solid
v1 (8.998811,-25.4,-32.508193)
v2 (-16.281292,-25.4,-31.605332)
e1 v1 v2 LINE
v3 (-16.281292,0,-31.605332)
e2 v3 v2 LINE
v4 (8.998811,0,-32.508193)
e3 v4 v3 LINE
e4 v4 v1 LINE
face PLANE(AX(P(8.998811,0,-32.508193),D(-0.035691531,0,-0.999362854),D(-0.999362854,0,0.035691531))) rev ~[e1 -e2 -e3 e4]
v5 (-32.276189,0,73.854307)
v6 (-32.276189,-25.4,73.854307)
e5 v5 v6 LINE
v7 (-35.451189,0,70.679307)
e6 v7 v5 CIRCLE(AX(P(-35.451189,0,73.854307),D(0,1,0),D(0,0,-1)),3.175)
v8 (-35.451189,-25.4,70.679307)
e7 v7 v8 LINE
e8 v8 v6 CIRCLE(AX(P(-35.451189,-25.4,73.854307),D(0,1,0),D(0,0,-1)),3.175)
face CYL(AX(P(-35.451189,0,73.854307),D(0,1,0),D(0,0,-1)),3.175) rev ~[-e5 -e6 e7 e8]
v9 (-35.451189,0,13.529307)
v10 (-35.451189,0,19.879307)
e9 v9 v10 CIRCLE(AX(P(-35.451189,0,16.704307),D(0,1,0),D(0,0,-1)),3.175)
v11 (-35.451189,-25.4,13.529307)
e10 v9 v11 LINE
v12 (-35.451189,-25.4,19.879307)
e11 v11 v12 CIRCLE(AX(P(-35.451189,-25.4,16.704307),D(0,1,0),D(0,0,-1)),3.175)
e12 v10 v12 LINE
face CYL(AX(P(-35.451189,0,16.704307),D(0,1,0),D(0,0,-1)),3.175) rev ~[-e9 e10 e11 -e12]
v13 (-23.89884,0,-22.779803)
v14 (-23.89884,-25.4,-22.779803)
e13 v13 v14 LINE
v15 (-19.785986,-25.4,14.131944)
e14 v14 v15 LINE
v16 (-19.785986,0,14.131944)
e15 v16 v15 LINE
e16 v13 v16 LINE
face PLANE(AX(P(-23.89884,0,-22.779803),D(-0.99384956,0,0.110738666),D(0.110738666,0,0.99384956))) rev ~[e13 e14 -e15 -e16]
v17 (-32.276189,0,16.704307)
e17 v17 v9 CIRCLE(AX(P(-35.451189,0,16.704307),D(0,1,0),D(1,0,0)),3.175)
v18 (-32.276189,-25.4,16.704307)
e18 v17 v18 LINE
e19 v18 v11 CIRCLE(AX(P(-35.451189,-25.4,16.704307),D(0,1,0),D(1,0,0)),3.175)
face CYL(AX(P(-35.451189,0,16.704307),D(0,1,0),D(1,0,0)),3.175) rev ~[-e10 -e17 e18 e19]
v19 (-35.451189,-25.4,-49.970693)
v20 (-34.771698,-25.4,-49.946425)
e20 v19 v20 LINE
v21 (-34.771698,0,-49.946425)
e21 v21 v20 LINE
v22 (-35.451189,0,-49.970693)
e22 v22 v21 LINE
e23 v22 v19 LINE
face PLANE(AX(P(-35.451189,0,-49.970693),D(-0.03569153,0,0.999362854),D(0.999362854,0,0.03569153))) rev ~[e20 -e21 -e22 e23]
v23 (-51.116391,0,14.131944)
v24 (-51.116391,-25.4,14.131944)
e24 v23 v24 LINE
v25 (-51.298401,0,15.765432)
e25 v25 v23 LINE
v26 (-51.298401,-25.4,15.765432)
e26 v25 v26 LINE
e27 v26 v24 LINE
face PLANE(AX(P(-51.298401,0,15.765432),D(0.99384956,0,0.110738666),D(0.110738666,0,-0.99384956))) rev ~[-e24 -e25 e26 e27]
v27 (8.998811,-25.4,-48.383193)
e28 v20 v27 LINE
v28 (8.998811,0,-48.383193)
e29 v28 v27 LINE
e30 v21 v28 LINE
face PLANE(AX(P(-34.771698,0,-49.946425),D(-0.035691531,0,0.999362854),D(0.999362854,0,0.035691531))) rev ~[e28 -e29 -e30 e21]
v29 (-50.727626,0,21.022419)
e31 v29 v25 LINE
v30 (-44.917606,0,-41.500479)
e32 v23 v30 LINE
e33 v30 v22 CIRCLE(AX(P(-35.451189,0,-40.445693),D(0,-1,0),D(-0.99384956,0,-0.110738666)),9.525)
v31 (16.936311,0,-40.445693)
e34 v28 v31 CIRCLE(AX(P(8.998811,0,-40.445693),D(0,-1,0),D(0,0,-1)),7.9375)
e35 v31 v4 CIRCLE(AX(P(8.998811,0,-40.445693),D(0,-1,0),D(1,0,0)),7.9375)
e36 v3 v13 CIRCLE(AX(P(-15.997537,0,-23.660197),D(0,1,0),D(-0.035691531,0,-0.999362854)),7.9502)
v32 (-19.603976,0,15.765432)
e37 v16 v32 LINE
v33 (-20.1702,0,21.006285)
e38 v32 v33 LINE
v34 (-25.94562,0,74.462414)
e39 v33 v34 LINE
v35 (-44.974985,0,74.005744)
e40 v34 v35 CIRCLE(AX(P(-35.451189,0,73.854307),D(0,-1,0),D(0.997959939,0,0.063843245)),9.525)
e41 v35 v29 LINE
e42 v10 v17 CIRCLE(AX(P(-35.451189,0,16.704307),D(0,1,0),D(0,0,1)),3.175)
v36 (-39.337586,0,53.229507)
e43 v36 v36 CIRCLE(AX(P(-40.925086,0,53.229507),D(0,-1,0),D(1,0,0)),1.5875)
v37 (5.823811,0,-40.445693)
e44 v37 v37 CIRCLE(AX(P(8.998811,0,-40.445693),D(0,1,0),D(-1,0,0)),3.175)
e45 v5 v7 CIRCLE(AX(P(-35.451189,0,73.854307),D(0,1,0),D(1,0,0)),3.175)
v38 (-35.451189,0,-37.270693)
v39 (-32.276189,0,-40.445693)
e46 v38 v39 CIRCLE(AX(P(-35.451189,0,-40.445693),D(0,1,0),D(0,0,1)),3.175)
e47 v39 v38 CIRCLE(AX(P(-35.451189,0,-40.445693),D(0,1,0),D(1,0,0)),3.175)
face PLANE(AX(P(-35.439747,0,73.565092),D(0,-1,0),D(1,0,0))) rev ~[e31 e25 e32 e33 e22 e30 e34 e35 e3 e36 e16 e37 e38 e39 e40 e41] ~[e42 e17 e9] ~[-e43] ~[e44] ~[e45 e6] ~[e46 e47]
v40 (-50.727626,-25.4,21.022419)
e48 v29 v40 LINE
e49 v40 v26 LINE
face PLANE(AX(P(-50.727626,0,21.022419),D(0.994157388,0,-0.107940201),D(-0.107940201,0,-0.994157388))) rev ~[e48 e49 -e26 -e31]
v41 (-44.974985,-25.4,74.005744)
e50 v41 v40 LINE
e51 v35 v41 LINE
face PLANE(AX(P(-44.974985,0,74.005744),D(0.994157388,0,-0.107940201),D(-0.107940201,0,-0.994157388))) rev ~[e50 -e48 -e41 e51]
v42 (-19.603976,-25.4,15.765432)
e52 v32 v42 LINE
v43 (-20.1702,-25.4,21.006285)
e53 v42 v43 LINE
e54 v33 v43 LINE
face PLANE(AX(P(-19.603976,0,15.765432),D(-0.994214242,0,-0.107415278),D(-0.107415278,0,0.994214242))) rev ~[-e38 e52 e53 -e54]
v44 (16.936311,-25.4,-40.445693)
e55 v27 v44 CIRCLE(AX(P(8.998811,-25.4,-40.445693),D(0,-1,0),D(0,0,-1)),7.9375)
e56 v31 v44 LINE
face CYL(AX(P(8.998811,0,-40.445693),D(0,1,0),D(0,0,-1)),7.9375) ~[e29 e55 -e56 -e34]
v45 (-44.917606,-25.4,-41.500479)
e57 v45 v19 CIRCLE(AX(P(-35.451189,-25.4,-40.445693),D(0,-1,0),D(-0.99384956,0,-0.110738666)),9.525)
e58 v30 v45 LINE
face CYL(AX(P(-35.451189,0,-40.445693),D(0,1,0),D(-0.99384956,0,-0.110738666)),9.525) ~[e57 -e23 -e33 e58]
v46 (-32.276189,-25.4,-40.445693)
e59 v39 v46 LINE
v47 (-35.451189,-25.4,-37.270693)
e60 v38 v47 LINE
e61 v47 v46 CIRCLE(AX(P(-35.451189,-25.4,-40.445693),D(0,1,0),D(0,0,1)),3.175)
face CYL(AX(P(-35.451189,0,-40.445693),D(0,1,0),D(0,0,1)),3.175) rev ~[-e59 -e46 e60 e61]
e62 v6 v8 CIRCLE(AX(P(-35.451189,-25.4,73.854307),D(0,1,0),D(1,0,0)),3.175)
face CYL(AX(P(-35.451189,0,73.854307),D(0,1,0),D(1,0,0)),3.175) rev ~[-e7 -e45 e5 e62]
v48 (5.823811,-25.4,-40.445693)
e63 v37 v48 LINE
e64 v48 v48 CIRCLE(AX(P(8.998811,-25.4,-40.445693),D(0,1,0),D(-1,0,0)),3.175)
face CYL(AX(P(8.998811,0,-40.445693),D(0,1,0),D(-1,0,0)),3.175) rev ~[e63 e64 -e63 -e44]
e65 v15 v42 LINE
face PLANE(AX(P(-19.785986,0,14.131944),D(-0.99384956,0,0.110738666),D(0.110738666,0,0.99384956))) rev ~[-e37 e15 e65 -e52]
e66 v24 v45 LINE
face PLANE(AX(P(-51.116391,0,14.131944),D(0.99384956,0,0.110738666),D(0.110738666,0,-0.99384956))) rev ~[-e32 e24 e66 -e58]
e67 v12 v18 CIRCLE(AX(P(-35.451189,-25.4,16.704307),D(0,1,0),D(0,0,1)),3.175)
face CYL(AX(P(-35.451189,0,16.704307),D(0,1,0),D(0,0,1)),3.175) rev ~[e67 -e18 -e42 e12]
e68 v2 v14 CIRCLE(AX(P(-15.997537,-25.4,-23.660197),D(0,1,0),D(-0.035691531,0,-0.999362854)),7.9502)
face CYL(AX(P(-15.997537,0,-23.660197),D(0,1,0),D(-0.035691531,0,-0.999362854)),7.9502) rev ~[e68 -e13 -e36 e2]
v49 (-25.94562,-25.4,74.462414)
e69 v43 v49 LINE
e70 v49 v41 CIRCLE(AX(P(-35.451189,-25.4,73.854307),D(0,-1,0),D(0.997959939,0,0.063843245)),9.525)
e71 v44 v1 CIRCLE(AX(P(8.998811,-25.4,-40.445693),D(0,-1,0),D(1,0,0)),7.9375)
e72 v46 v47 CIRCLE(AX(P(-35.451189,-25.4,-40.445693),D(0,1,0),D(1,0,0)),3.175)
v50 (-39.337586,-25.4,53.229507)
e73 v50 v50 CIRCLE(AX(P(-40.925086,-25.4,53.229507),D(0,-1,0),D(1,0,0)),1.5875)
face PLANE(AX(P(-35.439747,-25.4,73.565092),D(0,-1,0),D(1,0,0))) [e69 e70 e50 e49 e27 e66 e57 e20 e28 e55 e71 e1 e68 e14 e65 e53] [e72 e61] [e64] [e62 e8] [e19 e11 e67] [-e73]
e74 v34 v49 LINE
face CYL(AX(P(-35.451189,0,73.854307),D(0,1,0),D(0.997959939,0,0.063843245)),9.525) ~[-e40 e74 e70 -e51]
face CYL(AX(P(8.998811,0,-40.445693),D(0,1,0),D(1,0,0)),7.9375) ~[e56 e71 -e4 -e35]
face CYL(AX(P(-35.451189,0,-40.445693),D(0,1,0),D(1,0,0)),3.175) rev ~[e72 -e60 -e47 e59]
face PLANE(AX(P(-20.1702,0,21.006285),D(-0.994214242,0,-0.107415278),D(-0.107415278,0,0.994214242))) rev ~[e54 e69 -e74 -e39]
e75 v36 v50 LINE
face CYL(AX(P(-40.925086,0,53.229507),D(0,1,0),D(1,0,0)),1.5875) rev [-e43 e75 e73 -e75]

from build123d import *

# Parameters (mm, degrees)
F0_R     = 1.5875
F1_DEPTH = 25.4


with BuildPart() as f1:
    # F0 (on Front) → F1 (new body)
    with BuildSketch(Plane.XZ):
        with BuildLine():
            ThreePointArc((-44.9749847751, 74.0057436376), (-42.239710519, 67.1728704693), (-35.4511886835, 64.3293071628))
            ThreePointArc((-35.4511886835, 64.3293071628), (-28.7159965927, 67.119115072), (-25.9261886835, 73.8543071628))
            ThreePointArc((-25.9261886835, 73.8543071628), (-25.931047818, 74.1585158089), (-25.9456202636, 74.4624140737))
            ThreePointArc((-25.9456202636, 74.4624140737), (-35.6797057153, 83.3765655591), (-44.9749847751, 74.0057436376))
        make_face()
        with BuildLine():
            ThreePointArc((-32.2761886835, 73.8543071628), (-33.2061246532, 71.6092431325), (-35.4511886835, 70.6793071628))
            ThreePointArc((-35.4511886835, 70.6793071628), (-37.6962527138, 76.099371193), (-32.2761886835, 73.8543071628))
        make_face(mode=Mode.SUBTRACT)
        with BuildLine():
            ThreePointArc((-25.9261886835, 73.8543071628), (-28.7159965927, 67.119115072), (-35.4511886835, 64.3293071628))
            Line((-35.4511886835, 64.3293071628), (-35.4511886835, 32.5793071628))
            ThreePointArc((-35.4511886835, 32.5793071628), (-25.8667813668, 29.3595338058), (-20.1702001062, 21.0062849753))
            Line((-20.1702001062, 21.0062849753), (-25.9456202636, 74.4624140737))
            ThreePointArc((-25.9456202636, 74.4624140737), (-25.931047818, 74.1585158089), (-25.9261886835, 73.8543071628))
        make_face()
        with BuildLine():
            Line((-35.4511886835, 32.5793071628), (-35.4511886835, 64.3293071628))
            ThreePointArc((-35.4511886835, 64.3293071628), (-42.239710519, 67.1728704693), (-44.9749847751, 74.0057436376))
            Line((-44.9749847751, 74.0057436376), (-50.7276259168, 21.0224190715))
            ThreePointArc((-50.7276259168, 21.0224190715), (-45.0289127986, 29.3645925377), (-35.4511886835, 32.5793071628))
        make_face()
        with Locations((-40.9250855446, 53.2295071628)):
            Circle(F0_R, mode=Mode.SUBTRACT)
        with BuildLine():
            ThreePointArc((-20.1702001062, 21.0062849753), (-25.8667813668, 29.3595338058), (-35.4511886835, 32.5793071628))
            Line((-35.4511886835, 32.5793071628), (-35.4511886835, 19.8793071628))
            ThreePointArc((-35.4511886835, 19.8793071628), (-33.2061246532, 18.949371193), (-32.2761886835, 16.7043071628))
            ThreePointArc((-32.2761886835, 16.7043071628), (-33.2061246532, 14.4592431325), (-35.4511886835, 13.5293071628))
            Line((-35.4511886835, 13.5293071628), (-35.4511886835, 0.8293071628))
            ThreePointArc((-35.4511886835, 0.8293071628), (-25.1755047485, 4.6036483101), (-19.7859860662, 14.131944055))
            Line((-19.7859860662, 14.131944055), (-19.6039763716, 15.7654318029))
            Line((-19.6039763716, 15.7654318029), (-20.1702001062, 21.0062849753))
        make_face()
        with BuildLine():
            Line((-35.4511886835, 19.8793071628), (-35.4511886835, 32.5793071628))
            ThreePointArc((-35.4511886835, 32.5793071628), (-45.0289127986, 29.3645925377), (-50.7276259168, 21.0224190715))
            Line((-50.7276259168, 21.0224190715), (-51.2984009954, 15.7654318029))
            Line((-51.2984009954, 15.7654318029), (-51.1163913008, 14.131944055))
            ThreePointArc((-51.1163913008, 14.131944055), (-45.7268726185, 4.6036483101), (-35.4511886835, 0.8293071628))
            Line((-35.4511886835, 0.8293071628), (-35.4511886835, 13.5293071628))
            ThreePointArc((-35.4511886835, 13.5293071628), (-38.6261886835, 16.7043071628), (-35.4511886835, 19.8793071628))
        make_face()
        with BuildLine():
            ThreePointArc((-19.7859860662, 14.131944055), (-25.1755047485, 4.6036483101), (-35.4511886835, 0.8293071628))
            Line((-35.4511886835, 0.8293071628), (-35.4511886835, -30.9206928372))
            ThreePointArc((-35.4511886835, -30.9206928372), (-28.7159965927, -33.7105007464), (-25.9261886835, -40.4456928372))
            Line((-25.9261886835, -40.4456928372), (1.0613113165, -40.4456928372))
            ThreePointArc((1.0613113165, -40.4456928372), (3.3861512408, -34.8330327616), (8.9988113165, -32.5081928372))
            Line((8.9988113165, -32.5081928372), (-16.2812915947, -31.605332019))
            ThreePointArc((-16.2812915947, -31.605332019), (-22.0159487809, -28.8548482736), (-23.8988395601, -22.7798029084))
            Line((-23.8988395601, -22.7798029084), (-19.7859860662, 14.131944055))
        make_face()
        with BuildLine():
            Line((-35.4511886835, -30.9206928372), (-35.4511886835, 0.8293071628))
            ThreePointArc((-35.4511886835, 0.8293071628), (-45.7268726185, 4.6036483101), (-51.1163913008, 14.131944055))
            Line((-51.1163913008, 14.131944055), (-44.9176057417, -41.5004786351))
            ThreePointArc((-44.9176057417, -41.5004786351), (-42.5495145328, -34.0943626508), (-35.4511886835, -30.9206928372))
        make_face()
        with BuildLine():
            ThreePointArc((-25.9261886835, -40.4456928372), (-28.7159965927, -33.7105007464), (-35.4511886835, -30.9206928372))
            Line((-35.4511886835, -30.9206928372), (-35.4511886835, -37.2706928372))
            ThreePointArc((-35.4511886835, -37.2706928372), (-33.2061246532, -38.200628807), (-32.2761886835, -40.4456928372))
            Line((-32.2761886835, -40.4456928372), (-25.9261886835, -40.4456928372))
        make_face()
        with BuildLine():
            Line((-35.4511886835, -37.2706928372), (-35.4511886835, -30.9206928372))
            ThreePointArc((-35.4511886835, -30.9206928372), (-42.5495145328, -34.0943626508), (-44.9176057417, -41.5004786351))
            ThreePointArc((-44.9176057417, -41.5004786351), (-41.80251887, -47.5440186865), (-35.4511886835, -49.9706928372))
            Line((-35.4511886835, -49.9706928372), (-34.7716982376, -49.9464253213))
            ThreePointArc((-34.7716982376, -49.9464253213), (-28.4798985771, -46.9362043157), (-25.9261886835, -40.4456928372))
            Line((-25.9261886835, -40.4456928372), (-32.2761886835, -40.4456928372))
            ThreePointArc((-32.2761886835, -40.4456928372), (-37.6962527138, -42.6907568675), (-35.4511886835, -37.2706928372))
        make_face()
        with BuildLine():
            Line((1.0613113165, -40.4456928372), (-25.9261886835, -40.4456928372))
            ThreePointArc((-25.9261886835, -40.4456928372), (-28.4798985771, -46.9362043157), (-34.7716982376, -49.9464253213))
            Line((-34.7716982376, -49.9464253213), (8.9988113165, -48.3831928372))
            ThreePointArc((8.9988113165, -48.3831928372), (3.3861512408, -46.0583529129), (1.0613113165, -40.4456928372))
        make_face()
        with BuildLine():
            ThreePointArc((8.9988113165, -32.5081928372), (3.3861512408, -34.8330327616), (1.0613113165, -40.4456928372))
            ThreePointArc((1.0613113165, -40.4456928372), (3.3861512408, -46.0583529129), (8.9988113165, -48.3831928372))
            ThreePointArc((8.9988113165, -48.3831928372), (14.6114713922, -46.0583529129), (16.9363113165, -40.4456928372))
            ThreePointArc((16.9363113165, -40.4456928372), (14.6114713922, -34.8330327616), (8.9988113165, -32.5081928372))
        make_face()
        with BuildLine():
            ThreePointArc((12.1738113165, -40.4456928372), (8.9988113165, -43.6206928372), (5.8238113165, -40.4456928372))
            ThreePointArc((5.8238113165, -40.4456928372), (8.9988113165, -37.2706928372), (12.1738113165, -40.4456928372))
        make_face(mode=Mode.SUBTRACT)
    extrude(amount=F1_DEPTH)


solid = f1.part
